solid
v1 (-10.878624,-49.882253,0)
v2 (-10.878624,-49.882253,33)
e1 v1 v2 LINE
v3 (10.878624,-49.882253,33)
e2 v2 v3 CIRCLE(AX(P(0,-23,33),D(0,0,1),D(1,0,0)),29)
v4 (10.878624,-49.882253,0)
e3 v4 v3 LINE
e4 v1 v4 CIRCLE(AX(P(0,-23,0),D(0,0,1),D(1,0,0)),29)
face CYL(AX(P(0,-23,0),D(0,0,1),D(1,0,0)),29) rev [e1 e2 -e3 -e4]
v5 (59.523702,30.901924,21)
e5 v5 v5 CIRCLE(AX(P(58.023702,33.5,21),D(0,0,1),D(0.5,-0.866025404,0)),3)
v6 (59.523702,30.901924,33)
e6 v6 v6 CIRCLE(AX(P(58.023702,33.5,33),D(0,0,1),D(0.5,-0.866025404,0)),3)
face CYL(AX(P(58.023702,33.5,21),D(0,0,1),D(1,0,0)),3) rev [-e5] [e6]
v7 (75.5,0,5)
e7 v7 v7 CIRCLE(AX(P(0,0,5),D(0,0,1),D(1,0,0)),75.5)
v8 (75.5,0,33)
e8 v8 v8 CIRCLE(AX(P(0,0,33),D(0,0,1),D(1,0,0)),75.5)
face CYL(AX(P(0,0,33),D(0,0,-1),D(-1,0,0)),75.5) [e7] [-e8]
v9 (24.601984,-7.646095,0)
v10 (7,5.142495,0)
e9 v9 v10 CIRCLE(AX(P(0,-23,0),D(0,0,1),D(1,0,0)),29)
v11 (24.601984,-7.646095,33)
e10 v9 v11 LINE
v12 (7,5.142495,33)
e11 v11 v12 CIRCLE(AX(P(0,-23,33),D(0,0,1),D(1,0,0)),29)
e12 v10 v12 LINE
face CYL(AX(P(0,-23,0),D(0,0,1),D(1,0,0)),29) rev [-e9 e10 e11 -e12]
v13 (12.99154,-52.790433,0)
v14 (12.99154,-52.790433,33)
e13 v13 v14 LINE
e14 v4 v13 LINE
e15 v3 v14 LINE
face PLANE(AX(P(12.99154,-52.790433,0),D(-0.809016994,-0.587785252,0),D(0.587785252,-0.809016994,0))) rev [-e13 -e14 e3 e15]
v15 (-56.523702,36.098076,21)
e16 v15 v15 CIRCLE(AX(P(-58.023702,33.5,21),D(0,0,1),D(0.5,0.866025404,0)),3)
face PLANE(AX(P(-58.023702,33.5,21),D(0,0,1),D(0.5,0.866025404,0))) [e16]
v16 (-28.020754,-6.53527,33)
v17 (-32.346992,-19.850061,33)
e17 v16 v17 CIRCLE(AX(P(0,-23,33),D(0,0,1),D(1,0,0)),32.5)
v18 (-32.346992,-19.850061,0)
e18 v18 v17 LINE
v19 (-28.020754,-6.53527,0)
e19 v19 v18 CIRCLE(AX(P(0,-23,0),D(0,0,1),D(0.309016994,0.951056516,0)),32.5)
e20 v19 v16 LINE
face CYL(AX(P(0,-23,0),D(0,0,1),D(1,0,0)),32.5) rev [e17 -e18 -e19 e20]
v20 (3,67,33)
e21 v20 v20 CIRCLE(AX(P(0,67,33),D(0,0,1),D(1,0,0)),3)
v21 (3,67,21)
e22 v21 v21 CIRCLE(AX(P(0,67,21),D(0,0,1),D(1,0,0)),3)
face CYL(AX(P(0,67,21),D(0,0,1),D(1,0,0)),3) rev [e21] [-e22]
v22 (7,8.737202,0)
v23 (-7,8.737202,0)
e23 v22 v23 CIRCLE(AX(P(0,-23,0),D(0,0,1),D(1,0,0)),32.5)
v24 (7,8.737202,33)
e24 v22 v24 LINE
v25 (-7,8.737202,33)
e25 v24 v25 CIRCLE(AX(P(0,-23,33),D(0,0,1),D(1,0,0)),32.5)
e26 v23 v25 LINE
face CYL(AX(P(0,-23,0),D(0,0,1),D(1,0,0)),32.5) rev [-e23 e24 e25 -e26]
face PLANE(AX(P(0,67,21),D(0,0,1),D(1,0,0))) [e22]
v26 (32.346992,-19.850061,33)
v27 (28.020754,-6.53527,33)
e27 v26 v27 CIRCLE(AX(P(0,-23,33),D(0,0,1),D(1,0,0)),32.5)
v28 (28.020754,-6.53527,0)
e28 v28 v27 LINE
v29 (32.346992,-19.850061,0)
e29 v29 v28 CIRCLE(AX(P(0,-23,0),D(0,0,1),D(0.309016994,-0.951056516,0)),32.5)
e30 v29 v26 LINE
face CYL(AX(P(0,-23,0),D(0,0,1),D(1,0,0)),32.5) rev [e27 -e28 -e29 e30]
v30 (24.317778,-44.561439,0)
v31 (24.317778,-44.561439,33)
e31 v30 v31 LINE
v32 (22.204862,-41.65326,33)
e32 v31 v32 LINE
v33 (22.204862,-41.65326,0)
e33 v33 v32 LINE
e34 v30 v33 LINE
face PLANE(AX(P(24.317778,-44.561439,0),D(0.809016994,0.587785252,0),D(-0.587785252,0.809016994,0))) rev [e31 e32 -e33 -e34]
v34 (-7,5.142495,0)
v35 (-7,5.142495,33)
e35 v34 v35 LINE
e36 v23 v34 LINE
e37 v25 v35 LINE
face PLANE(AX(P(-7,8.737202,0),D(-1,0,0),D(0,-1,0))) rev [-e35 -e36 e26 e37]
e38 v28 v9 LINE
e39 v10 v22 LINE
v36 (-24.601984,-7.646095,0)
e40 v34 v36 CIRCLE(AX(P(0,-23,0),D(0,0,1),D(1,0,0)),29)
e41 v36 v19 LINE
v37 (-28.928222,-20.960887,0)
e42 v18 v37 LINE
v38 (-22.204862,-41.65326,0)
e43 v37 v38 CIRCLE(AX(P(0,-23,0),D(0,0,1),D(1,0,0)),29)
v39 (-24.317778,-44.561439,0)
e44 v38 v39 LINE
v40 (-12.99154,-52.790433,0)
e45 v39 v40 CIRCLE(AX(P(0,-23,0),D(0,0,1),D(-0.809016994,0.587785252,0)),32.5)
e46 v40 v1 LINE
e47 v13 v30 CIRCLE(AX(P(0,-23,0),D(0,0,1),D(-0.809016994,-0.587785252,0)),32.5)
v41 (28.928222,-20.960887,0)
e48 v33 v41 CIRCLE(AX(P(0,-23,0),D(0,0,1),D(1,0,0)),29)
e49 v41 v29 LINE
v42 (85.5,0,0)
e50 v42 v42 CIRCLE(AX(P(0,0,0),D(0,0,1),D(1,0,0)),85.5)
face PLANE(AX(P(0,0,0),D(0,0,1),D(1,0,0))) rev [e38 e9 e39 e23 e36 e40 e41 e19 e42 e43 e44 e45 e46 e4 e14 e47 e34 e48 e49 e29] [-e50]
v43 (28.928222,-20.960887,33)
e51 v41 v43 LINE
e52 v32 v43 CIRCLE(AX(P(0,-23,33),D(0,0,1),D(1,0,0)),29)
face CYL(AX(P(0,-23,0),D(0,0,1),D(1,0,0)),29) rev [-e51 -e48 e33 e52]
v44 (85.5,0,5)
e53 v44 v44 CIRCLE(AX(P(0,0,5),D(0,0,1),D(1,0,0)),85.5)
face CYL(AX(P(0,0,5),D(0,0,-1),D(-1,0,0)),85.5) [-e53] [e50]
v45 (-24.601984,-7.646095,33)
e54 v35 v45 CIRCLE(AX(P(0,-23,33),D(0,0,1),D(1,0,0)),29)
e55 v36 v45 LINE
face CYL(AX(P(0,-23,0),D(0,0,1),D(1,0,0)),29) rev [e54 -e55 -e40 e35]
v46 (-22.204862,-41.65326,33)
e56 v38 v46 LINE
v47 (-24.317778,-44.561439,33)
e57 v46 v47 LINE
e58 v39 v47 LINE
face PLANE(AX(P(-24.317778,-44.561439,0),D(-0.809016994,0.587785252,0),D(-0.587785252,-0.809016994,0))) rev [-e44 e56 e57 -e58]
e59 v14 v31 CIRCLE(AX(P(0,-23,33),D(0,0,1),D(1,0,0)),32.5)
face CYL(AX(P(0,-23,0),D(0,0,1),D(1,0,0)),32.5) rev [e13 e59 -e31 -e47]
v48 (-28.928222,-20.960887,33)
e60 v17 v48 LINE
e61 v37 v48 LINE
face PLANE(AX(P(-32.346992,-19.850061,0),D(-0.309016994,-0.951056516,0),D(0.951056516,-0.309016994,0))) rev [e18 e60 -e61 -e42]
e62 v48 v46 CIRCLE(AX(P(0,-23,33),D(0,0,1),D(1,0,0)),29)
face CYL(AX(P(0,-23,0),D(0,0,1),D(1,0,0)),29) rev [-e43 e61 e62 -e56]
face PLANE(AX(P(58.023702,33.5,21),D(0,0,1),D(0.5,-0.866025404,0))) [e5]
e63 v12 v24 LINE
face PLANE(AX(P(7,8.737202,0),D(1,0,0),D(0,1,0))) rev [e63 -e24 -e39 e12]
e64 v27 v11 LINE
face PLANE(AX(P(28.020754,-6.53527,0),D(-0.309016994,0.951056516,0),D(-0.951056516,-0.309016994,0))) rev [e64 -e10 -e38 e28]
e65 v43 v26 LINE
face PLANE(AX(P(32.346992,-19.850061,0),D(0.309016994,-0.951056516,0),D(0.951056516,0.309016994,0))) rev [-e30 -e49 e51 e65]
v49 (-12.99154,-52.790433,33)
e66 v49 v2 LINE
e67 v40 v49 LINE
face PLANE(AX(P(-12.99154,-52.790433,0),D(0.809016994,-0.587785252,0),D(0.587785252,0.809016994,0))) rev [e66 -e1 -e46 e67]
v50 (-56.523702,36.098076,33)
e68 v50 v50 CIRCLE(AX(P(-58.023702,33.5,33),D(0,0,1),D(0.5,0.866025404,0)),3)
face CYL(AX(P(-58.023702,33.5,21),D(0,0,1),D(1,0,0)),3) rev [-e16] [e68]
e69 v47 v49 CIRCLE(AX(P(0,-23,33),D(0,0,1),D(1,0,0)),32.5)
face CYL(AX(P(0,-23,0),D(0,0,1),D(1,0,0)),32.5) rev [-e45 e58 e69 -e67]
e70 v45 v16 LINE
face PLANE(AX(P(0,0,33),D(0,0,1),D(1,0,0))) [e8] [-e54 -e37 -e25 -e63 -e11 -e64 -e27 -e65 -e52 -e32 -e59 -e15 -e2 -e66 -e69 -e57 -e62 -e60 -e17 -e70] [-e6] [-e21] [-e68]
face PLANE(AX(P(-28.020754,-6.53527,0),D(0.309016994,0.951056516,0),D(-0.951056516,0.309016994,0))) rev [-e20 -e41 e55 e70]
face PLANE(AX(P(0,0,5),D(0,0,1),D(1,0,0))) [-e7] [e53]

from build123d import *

# Parameters (mm, degrees)
SKETCH2_R                   = 85.5
BOSS_EXTRUDE1_DEPTH         = 5
SKETCH4_R                   = 75.5
BOSS_EXTRUDE2_DEPTH         = 28
SKETCH5_R                   = 29
CUT_EXTRUDE1_DEPTH          = 126.337544256
CUT_EXTRUDE2_DEPTH          = 126.337544256
CIRPATTERN1_COUNT           = 5
SKETCH10_R                  = 3
CUT_EXTRUDE3_DEPTH          = 12
CIRPATTERN2_COUNT           = 2
CIRPATTERN2_ANGLE           = 60
CIRPATTERN3_COPY_1_SKETCH_R = 3
CIRPATTERN3_COPY_1_DEPTH    = 12
CIRPATTERN3_COPY_2_SKETCH_R = 3
CIRPATTERN3_COPY_2_DEPTH    = 12


with BuildPart() as part:
    # Sketch2 → Boss-Extrude1 (new body)
    with BuildSketch(Plane.XY):
        Circle(SKETCH2_R)
    extrude(amount=BOSS_EXTRUDE1_DEPTH)

    # Sketch4 → Boss-Extrude2 (add)
    with BuildSketch(Plane.XY.offset(5)):
        Circle(SKETCH4_R)
    extrude(amount=BOSS_EXTRUDE2_DEPTH)

    # Sketch5 → Cut-Extrude1 (cut, through all)
    with BuildSketch(Plane.XY.offset(33)):
        with Locations((0, -23)):
            Circle(SKETCH5_R)
    extrude(amount=-CUT_EXTRUDE1_DEPTH, mode=Mode.SUBTRACT)

    # Sketch7 → Cut-Extrude2 (cut, symmetric)
    with BuildSketch(Plane.XY.offset(33)):
        with BuildLine():
            Line((-7, 8.737202145), (-7, 5.142494559))
            ThreePointArc((-7, 5.142494559), (0, 6), (7, 5.142494559))
            Line((7, 5.142494559), (7, 8.737202145))
            ThreePointArc((7, 8.737202145), (0, 9.5), (-7, 8.737202145))
        make_face()
    cut_extrude2 = extrude(amount=CUT_EXTRUDE2_DEPTH, both=True, mode=Mode.SUBTRACT)

    # CirPattern1: Cut-Extrude2 ×5 about axis
    cirpattern1_axis = Axis((0, -23, 33), (0, 0, 1))
    for i in range(1, CIRPATTERN1_COUNT):
        add(cut_extrude2.rotate(cirpattern1_axis, i * 360 / CIRPATTERN1_COUNT), mode=Mode.SUBTRACT)

    # Sketch10 → Cut-Extrude3 (cut)
    with BuildSketch(Plane.XY.offset(33)):
        with Locations((0, 67)):
            Circle(SKETCH10_R)
    cut_extrude3 = extrude(amount=-CUT_EXTRUDE3_DEPTH, mode=Mode.SUBTRACT)

    # CirPattern2: Cut-Extrude3 ×2 about axis
    cirpattern2_axis = Axis((0, 0, 5), (0, 0, 1))
    for i in range(1, CIRPATTERN2_COUNT):
        add(cut_extrude3.rotate(cirpattern2_axis, i * CIRPATTERN2_ANGLE / (CIRPATTERN2_COUNT - 1)), mode=Mode.SUBTRACT)

    # CirPattern3 copy 1 sketch → CirPattern3 copy 1 (cut)
    with BuildSketch(Plane.XY.offset(33)):
        with Locations((0, 67)):
            Circle(CIRPATTERN3_COPY_1_SKETCH_R)
    extrude(amount=-CIRPATTERN3_COPY_1_DEPTH, mode=Mode.SUBTRACT)

    # CirPattern3 copy 2 sketch → CirPattern3 copy 2 (cut)
    with BuildSketch(Plane(origin=(0, 0, 33), x_dir=(0.4999999999999978, -0.8660254037844399, 0), z_dir=(0, 0, 1))):
        with Locations((0, 67)):
            Circle(CIRPATTERN3_COPY_2_SKETCH_R)
    extrude(amount=-CIRPATTERN3_COPY_2_DEPTH, mode=Mode.SUBTRACT)


solid = part.part
